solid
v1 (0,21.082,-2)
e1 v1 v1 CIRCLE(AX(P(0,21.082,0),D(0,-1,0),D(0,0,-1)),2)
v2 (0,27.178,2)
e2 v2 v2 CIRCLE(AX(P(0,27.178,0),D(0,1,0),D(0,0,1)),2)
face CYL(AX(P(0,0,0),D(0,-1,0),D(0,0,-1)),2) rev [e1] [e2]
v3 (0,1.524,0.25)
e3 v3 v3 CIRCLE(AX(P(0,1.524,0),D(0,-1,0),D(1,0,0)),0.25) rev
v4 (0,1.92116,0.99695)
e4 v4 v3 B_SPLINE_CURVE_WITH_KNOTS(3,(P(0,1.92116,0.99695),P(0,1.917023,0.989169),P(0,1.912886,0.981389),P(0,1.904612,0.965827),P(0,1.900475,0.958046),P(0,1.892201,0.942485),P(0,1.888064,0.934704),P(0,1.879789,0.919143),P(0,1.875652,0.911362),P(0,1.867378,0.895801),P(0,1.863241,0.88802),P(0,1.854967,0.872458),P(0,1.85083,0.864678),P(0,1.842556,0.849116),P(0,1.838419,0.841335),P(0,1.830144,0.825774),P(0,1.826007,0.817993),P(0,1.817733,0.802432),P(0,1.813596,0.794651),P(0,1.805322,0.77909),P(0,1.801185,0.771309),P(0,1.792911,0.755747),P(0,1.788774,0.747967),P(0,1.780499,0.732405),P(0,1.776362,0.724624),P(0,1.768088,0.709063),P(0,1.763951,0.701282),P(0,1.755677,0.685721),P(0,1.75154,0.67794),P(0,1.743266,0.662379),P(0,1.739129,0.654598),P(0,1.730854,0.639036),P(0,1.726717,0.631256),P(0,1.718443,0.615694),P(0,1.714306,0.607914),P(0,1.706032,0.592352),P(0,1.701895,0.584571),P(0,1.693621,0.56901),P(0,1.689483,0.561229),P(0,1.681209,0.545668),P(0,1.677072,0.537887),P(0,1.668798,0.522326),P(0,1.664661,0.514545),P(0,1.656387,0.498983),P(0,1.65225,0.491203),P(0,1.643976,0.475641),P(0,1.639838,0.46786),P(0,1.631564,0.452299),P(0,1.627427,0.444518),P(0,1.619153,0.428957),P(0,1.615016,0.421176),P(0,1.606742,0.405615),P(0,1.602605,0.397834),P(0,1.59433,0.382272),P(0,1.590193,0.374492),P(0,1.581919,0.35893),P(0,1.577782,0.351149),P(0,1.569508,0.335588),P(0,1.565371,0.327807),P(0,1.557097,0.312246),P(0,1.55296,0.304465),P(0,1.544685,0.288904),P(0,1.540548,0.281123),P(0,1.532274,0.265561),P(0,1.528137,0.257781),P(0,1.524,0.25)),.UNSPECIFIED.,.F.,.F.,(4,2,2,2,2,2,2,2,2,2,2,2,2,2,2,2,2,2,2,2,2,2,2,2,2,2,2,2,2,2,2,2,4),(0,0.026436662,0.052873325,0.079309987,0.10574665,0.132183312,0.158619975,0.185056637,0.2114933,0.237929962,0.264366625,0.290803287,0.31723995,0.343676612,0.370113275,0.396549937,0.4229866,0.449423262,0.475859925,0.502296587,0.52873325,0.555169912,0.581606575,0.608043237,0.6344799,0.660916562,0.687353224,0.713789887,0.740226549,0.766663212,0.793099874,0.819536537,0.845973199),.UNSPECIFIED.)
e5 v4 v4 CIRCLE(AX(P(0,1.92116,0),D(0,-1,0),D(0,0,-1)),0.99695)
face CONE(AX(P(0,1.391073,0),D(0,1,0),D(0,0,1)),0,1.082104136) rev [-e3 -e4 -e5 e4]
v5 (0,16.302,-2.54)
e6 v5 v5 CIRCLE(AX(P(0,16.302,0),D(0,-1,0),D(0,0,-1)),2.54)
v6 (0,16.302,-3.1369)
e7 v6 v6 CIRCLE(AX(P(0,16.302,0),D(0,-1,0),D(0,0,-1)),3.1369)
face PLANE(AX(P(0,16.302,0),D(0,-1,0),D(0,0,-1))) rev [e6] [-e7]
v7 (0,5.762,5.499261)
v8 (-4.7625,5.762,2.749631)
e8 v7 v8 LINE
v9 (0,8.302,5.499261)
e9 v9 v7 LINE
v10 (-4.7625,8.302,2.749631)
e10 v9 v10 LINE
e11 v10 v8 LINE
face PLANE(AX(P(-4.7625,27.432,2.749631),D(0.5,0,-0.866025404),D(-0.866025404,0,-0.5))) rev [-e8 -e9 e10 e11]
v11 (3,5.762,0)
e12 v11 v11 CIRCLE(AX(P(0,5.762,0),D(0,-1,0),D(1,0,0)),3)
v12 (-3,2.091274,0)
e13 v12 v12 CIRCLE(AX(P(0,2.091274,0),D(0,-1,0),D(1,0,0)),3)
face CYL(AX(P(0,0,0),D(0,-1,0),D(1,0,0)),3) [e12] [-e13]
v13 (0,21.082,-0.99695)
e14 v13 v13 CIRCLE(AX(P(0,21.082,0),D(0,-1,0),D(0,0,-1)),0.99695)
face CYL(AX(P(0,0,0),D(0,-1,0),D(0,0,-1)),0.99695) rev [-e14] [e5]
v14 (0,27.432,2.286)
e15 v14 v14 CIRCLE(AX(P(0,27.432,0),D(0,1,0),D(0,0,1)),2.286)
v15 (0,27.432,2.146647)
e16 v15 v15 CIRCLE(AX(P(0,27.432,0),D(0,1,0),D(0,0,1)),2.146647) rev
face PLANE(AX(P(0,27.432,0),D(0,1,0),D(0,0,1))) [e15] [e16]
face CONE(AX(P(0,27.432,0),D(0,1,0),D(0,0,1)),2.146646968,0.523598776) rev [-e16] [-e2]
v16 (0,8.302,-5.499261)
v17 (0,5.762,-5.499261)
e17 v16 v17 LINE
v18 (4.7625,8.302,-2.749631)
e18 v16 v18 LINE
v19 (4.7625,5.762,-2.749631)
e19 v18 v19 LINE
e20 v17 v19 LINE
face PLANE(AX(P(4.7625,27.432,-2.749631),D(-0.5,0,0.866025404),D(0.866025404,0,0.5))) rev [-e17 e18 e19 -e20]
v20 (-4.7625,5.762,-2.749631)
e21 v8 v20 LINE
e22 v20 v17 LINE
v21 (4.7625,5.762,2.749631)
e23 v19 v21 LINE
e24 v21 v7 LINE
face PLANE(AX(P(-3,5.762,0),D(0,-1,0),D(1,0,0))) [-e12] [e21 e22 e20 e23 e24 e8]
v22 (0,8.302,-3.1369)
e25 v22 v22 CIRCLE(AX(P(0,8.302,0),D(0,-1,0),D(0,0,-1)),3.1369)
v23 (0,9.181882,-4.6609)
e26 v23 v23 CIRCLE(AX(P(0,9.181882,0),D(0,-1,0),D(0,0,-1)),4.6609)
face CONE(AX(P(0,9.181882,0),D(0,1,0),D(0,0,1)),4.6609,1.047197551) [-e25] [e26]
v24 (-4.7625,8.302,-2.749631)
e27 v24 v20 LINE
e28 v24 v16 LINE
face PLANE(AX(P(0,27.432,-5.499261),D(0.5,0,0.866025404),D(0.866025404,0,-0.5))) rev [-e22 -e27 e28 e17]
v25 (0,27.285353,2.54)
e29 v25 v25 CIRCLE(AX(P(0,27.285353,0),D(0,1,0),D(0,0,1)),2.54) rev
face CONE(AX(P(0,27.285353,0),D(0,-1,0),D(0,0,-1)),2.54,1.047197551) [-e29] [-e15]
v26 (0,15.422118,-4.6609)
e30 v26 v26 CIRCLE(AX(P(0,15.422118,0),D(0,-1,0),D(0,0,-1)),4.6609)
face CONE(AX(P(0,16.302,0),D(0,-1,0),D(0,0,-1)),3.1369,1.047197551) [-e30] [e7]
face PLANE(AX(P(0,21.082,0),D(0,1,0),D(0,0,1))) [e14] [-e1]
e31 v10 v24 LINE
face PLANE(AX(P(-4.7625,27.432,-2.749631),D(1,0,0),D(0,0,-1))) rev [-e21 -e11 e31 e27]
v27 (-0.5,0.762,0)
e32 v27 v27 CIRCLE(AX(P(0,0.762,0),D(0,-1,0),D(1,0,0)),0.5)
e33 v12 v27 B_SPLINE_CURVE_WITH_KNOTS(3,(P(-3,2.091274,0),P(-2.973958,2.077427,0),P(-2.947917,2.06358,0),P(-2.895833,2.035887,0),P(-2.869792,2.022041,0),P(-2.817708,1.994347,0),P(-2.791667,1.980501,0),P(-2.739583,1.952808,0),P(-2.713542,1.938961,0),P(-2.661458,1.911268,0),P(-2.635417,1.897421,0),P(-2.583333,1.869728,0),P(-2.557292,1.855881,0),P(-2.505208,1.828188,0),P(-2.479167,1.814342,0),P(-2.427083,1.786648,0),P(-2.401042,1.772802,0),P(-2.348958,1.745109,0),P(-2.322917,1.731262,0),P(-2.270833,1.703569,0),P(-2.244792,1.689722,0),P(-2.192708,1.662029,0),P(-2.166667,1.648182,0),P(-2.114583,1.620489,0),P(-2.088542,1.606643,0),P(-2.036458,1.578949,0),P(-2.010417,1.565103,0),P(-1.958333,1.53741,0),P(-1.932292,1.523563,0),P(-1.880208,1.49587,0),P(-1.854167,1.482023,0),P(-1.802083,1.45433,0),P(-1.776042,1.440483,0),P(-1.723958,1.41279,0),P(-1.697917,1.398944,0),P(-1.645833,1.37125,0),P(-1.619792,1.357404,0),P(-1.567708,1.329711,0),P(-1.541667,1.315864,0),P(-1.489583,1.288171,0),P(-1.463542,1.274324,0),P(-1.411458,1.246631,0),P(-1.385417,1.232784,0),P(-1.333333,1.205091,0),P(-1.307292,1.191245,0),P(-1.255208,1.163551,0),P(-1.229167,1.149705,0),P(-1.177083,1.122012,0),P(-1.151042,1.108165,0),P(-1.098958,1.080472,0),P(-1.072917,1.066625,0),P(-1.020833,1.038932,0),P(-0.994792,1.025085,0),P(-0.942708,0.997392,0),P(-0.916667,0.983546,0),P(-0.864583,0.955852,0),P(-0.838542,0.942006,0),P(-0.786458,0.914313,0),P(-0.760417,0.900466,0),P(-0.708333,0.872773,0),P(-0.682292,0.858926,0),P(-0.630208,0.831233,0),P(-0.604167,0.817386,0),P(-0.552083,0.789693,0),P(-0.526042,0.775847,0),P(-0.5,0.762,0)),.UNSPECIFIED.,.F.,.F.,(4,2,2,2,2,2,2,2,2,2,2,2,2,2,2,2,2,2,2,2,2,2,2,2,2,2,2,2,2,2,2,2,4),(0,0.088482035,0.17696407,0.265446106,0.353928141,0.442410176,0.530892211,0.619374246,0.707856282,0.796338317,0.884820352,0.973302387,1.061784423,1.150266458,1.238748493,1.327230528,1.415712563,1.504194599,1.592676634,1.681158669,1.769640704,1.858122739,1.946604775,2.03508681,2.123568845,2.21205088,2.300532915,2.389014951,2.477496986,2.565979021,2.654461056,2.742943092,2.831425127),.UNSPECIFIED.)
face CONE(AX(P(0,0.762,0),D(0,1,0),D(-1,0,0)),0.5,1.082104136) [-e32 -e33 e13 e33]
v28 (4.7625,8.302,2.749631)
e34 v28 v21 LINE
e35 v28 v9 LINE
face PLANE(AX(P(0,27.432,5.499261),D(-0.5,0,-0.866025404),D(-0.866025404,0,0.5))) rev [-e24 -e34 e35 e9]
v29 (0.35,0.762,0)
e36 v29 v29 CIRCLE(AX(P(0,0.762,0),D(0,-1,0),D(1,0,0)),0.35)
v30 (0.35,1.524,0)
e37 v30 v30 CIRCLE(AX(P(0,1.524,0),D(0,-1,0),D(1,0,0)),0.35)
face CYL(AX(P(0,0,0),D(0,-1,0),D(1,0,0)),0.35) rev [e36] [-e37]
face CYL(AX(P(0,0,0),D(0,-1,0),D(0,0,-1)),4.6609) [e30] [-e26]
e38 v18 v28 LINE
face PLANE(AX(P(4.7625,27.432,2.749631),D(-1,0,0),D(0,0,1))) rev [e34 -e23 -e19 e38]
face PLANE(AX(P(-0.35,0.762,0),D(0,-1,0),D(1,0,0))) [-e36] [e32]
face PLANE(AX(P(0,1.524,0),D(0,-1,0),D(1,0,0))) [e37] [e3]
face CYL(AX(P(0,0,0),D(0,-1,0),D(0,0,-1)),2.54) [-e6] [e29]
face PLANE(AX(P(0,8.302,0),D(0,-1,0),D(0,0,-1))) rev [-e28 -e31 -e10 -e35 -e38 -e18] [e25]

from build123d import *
from OCP.BRepFilletAPI import BRepFilletAPI_MakeChamfer

# Parameters (mm, degrees)
BOSS_EXTRUDE1_DEPTH = 27.432
CHAMFER1_SIZE       = 0.254
CHAMFER1_SIZE2      = 0.146646968


# Read off the part's stored shape, not the designer's step: Cut-Revolve4
with BuildPart() as part:
    # Sketch3 → Boss-Extrude1 (new body)
    with BuildSketch(Plane(origin=(0, 0, 0), x_dir=(1, 0, 0), z_dir=(0, 1, 0))):
        Polygon((4.7625, 2.749630657), (0, 5.499261314), (-4.7625, 2.749630657), (-4.7625, -2.749630657), (0, -5.499261314), (4.7625, -2.749630657), align=None)
    extrude(amount=BOSS_EXTRUDE1_DEPTH)

    # Cut-Revolve4 outline → Cut-Revolve4 (revolve, cut)
    with BuildSketch(Plane.XY):
        Polygon((4.6609, 9.18188181), (3.1369, 8.302), (5.499261314, 8.302), (5.499261314, 27.432), (2.54, 27.432), (2.54, 16.302), (3.1369, 16.302), (4.6609, 15.42211819), align=None)
        Polygon((0.99695, 21.082), (2, 21.082), (2, 27.432), (0, 27.432), (0, 1.391072642), (0.99695, 1.92116036), align=None)
    revolve(axis=Axis((0, 0, 0), (0, 1, 0)), mode=Mode.SUBTRACT)

    # Chamfer1: one chamfer whose edges measure the first distance from different faces: ONE call of the kernel's chamfer builder (chamfer() names one face for all edges)
    chamfer1_edges_1 = [part.edges().sort_by_distance(p)[0] for p in [
        (-2.54, 27.432, 0),
    ]]
    chamfer1_side_1 = [part.faces().sort_by_distance(p)[0] for p in [
        (-2.468157951, 27.432, 0),
    ]]
    chamfer1_edges_2 = [part.edges().sort_by_distance(p)[0] for p in [
        (-2, 27.432, 0),
    ]]
    chamfer1_side_2 = [part.faces().sort_by_distance(p)[0] for p in [
        (-2, 24.257, 0),
    ]]
    chamfer1 = BRepFilletAPI_MakeChamfer(part.part.solid().wrapped)
    for e in chamfer1_edges_1:
        chamfer1.Add(CHAMFER1_SIZE, CHAMFER1_SIZE2, e.wrapped, chamfer1_side_1[0].wrapped)  # the first distance lies on this face
    for e in chamfer1_edges_2:
        chamfer1.Add(CHAMFER1_SIZE, CHAMFER1_SIZE2, e.wrapped, chamfer1_side_2[0].wrapped)  # the first distance lies on this face
    add(Compound.cast(chamfer1.Shape()), mode=Mode.REPLACE)

    # Sketch4 → Cut-Revolve5 (revolve, cut)
    with BuildSketch(Plane.XY, mode=Mode.PRIVATE) as cut_revolve5_sk:
        Polygon((-0.35, 0.762), (-0.5, 0.762), (-3, 2.091273579), (-3, 5.762), (-6.107414125, 5.762), (-6.107414125, 0), (0, 0), (0, 1.524), (-0.35, 1.524), align=None)
    revolve(cut_revolve5_sk.sketch.rotate(Axis((0, 0, 0), (0, 1, 0)), 270), axis=Axis((0, 0, 0), (0, 1, 0)), mode=Mode.SUBTRACT)


solid = part.part
